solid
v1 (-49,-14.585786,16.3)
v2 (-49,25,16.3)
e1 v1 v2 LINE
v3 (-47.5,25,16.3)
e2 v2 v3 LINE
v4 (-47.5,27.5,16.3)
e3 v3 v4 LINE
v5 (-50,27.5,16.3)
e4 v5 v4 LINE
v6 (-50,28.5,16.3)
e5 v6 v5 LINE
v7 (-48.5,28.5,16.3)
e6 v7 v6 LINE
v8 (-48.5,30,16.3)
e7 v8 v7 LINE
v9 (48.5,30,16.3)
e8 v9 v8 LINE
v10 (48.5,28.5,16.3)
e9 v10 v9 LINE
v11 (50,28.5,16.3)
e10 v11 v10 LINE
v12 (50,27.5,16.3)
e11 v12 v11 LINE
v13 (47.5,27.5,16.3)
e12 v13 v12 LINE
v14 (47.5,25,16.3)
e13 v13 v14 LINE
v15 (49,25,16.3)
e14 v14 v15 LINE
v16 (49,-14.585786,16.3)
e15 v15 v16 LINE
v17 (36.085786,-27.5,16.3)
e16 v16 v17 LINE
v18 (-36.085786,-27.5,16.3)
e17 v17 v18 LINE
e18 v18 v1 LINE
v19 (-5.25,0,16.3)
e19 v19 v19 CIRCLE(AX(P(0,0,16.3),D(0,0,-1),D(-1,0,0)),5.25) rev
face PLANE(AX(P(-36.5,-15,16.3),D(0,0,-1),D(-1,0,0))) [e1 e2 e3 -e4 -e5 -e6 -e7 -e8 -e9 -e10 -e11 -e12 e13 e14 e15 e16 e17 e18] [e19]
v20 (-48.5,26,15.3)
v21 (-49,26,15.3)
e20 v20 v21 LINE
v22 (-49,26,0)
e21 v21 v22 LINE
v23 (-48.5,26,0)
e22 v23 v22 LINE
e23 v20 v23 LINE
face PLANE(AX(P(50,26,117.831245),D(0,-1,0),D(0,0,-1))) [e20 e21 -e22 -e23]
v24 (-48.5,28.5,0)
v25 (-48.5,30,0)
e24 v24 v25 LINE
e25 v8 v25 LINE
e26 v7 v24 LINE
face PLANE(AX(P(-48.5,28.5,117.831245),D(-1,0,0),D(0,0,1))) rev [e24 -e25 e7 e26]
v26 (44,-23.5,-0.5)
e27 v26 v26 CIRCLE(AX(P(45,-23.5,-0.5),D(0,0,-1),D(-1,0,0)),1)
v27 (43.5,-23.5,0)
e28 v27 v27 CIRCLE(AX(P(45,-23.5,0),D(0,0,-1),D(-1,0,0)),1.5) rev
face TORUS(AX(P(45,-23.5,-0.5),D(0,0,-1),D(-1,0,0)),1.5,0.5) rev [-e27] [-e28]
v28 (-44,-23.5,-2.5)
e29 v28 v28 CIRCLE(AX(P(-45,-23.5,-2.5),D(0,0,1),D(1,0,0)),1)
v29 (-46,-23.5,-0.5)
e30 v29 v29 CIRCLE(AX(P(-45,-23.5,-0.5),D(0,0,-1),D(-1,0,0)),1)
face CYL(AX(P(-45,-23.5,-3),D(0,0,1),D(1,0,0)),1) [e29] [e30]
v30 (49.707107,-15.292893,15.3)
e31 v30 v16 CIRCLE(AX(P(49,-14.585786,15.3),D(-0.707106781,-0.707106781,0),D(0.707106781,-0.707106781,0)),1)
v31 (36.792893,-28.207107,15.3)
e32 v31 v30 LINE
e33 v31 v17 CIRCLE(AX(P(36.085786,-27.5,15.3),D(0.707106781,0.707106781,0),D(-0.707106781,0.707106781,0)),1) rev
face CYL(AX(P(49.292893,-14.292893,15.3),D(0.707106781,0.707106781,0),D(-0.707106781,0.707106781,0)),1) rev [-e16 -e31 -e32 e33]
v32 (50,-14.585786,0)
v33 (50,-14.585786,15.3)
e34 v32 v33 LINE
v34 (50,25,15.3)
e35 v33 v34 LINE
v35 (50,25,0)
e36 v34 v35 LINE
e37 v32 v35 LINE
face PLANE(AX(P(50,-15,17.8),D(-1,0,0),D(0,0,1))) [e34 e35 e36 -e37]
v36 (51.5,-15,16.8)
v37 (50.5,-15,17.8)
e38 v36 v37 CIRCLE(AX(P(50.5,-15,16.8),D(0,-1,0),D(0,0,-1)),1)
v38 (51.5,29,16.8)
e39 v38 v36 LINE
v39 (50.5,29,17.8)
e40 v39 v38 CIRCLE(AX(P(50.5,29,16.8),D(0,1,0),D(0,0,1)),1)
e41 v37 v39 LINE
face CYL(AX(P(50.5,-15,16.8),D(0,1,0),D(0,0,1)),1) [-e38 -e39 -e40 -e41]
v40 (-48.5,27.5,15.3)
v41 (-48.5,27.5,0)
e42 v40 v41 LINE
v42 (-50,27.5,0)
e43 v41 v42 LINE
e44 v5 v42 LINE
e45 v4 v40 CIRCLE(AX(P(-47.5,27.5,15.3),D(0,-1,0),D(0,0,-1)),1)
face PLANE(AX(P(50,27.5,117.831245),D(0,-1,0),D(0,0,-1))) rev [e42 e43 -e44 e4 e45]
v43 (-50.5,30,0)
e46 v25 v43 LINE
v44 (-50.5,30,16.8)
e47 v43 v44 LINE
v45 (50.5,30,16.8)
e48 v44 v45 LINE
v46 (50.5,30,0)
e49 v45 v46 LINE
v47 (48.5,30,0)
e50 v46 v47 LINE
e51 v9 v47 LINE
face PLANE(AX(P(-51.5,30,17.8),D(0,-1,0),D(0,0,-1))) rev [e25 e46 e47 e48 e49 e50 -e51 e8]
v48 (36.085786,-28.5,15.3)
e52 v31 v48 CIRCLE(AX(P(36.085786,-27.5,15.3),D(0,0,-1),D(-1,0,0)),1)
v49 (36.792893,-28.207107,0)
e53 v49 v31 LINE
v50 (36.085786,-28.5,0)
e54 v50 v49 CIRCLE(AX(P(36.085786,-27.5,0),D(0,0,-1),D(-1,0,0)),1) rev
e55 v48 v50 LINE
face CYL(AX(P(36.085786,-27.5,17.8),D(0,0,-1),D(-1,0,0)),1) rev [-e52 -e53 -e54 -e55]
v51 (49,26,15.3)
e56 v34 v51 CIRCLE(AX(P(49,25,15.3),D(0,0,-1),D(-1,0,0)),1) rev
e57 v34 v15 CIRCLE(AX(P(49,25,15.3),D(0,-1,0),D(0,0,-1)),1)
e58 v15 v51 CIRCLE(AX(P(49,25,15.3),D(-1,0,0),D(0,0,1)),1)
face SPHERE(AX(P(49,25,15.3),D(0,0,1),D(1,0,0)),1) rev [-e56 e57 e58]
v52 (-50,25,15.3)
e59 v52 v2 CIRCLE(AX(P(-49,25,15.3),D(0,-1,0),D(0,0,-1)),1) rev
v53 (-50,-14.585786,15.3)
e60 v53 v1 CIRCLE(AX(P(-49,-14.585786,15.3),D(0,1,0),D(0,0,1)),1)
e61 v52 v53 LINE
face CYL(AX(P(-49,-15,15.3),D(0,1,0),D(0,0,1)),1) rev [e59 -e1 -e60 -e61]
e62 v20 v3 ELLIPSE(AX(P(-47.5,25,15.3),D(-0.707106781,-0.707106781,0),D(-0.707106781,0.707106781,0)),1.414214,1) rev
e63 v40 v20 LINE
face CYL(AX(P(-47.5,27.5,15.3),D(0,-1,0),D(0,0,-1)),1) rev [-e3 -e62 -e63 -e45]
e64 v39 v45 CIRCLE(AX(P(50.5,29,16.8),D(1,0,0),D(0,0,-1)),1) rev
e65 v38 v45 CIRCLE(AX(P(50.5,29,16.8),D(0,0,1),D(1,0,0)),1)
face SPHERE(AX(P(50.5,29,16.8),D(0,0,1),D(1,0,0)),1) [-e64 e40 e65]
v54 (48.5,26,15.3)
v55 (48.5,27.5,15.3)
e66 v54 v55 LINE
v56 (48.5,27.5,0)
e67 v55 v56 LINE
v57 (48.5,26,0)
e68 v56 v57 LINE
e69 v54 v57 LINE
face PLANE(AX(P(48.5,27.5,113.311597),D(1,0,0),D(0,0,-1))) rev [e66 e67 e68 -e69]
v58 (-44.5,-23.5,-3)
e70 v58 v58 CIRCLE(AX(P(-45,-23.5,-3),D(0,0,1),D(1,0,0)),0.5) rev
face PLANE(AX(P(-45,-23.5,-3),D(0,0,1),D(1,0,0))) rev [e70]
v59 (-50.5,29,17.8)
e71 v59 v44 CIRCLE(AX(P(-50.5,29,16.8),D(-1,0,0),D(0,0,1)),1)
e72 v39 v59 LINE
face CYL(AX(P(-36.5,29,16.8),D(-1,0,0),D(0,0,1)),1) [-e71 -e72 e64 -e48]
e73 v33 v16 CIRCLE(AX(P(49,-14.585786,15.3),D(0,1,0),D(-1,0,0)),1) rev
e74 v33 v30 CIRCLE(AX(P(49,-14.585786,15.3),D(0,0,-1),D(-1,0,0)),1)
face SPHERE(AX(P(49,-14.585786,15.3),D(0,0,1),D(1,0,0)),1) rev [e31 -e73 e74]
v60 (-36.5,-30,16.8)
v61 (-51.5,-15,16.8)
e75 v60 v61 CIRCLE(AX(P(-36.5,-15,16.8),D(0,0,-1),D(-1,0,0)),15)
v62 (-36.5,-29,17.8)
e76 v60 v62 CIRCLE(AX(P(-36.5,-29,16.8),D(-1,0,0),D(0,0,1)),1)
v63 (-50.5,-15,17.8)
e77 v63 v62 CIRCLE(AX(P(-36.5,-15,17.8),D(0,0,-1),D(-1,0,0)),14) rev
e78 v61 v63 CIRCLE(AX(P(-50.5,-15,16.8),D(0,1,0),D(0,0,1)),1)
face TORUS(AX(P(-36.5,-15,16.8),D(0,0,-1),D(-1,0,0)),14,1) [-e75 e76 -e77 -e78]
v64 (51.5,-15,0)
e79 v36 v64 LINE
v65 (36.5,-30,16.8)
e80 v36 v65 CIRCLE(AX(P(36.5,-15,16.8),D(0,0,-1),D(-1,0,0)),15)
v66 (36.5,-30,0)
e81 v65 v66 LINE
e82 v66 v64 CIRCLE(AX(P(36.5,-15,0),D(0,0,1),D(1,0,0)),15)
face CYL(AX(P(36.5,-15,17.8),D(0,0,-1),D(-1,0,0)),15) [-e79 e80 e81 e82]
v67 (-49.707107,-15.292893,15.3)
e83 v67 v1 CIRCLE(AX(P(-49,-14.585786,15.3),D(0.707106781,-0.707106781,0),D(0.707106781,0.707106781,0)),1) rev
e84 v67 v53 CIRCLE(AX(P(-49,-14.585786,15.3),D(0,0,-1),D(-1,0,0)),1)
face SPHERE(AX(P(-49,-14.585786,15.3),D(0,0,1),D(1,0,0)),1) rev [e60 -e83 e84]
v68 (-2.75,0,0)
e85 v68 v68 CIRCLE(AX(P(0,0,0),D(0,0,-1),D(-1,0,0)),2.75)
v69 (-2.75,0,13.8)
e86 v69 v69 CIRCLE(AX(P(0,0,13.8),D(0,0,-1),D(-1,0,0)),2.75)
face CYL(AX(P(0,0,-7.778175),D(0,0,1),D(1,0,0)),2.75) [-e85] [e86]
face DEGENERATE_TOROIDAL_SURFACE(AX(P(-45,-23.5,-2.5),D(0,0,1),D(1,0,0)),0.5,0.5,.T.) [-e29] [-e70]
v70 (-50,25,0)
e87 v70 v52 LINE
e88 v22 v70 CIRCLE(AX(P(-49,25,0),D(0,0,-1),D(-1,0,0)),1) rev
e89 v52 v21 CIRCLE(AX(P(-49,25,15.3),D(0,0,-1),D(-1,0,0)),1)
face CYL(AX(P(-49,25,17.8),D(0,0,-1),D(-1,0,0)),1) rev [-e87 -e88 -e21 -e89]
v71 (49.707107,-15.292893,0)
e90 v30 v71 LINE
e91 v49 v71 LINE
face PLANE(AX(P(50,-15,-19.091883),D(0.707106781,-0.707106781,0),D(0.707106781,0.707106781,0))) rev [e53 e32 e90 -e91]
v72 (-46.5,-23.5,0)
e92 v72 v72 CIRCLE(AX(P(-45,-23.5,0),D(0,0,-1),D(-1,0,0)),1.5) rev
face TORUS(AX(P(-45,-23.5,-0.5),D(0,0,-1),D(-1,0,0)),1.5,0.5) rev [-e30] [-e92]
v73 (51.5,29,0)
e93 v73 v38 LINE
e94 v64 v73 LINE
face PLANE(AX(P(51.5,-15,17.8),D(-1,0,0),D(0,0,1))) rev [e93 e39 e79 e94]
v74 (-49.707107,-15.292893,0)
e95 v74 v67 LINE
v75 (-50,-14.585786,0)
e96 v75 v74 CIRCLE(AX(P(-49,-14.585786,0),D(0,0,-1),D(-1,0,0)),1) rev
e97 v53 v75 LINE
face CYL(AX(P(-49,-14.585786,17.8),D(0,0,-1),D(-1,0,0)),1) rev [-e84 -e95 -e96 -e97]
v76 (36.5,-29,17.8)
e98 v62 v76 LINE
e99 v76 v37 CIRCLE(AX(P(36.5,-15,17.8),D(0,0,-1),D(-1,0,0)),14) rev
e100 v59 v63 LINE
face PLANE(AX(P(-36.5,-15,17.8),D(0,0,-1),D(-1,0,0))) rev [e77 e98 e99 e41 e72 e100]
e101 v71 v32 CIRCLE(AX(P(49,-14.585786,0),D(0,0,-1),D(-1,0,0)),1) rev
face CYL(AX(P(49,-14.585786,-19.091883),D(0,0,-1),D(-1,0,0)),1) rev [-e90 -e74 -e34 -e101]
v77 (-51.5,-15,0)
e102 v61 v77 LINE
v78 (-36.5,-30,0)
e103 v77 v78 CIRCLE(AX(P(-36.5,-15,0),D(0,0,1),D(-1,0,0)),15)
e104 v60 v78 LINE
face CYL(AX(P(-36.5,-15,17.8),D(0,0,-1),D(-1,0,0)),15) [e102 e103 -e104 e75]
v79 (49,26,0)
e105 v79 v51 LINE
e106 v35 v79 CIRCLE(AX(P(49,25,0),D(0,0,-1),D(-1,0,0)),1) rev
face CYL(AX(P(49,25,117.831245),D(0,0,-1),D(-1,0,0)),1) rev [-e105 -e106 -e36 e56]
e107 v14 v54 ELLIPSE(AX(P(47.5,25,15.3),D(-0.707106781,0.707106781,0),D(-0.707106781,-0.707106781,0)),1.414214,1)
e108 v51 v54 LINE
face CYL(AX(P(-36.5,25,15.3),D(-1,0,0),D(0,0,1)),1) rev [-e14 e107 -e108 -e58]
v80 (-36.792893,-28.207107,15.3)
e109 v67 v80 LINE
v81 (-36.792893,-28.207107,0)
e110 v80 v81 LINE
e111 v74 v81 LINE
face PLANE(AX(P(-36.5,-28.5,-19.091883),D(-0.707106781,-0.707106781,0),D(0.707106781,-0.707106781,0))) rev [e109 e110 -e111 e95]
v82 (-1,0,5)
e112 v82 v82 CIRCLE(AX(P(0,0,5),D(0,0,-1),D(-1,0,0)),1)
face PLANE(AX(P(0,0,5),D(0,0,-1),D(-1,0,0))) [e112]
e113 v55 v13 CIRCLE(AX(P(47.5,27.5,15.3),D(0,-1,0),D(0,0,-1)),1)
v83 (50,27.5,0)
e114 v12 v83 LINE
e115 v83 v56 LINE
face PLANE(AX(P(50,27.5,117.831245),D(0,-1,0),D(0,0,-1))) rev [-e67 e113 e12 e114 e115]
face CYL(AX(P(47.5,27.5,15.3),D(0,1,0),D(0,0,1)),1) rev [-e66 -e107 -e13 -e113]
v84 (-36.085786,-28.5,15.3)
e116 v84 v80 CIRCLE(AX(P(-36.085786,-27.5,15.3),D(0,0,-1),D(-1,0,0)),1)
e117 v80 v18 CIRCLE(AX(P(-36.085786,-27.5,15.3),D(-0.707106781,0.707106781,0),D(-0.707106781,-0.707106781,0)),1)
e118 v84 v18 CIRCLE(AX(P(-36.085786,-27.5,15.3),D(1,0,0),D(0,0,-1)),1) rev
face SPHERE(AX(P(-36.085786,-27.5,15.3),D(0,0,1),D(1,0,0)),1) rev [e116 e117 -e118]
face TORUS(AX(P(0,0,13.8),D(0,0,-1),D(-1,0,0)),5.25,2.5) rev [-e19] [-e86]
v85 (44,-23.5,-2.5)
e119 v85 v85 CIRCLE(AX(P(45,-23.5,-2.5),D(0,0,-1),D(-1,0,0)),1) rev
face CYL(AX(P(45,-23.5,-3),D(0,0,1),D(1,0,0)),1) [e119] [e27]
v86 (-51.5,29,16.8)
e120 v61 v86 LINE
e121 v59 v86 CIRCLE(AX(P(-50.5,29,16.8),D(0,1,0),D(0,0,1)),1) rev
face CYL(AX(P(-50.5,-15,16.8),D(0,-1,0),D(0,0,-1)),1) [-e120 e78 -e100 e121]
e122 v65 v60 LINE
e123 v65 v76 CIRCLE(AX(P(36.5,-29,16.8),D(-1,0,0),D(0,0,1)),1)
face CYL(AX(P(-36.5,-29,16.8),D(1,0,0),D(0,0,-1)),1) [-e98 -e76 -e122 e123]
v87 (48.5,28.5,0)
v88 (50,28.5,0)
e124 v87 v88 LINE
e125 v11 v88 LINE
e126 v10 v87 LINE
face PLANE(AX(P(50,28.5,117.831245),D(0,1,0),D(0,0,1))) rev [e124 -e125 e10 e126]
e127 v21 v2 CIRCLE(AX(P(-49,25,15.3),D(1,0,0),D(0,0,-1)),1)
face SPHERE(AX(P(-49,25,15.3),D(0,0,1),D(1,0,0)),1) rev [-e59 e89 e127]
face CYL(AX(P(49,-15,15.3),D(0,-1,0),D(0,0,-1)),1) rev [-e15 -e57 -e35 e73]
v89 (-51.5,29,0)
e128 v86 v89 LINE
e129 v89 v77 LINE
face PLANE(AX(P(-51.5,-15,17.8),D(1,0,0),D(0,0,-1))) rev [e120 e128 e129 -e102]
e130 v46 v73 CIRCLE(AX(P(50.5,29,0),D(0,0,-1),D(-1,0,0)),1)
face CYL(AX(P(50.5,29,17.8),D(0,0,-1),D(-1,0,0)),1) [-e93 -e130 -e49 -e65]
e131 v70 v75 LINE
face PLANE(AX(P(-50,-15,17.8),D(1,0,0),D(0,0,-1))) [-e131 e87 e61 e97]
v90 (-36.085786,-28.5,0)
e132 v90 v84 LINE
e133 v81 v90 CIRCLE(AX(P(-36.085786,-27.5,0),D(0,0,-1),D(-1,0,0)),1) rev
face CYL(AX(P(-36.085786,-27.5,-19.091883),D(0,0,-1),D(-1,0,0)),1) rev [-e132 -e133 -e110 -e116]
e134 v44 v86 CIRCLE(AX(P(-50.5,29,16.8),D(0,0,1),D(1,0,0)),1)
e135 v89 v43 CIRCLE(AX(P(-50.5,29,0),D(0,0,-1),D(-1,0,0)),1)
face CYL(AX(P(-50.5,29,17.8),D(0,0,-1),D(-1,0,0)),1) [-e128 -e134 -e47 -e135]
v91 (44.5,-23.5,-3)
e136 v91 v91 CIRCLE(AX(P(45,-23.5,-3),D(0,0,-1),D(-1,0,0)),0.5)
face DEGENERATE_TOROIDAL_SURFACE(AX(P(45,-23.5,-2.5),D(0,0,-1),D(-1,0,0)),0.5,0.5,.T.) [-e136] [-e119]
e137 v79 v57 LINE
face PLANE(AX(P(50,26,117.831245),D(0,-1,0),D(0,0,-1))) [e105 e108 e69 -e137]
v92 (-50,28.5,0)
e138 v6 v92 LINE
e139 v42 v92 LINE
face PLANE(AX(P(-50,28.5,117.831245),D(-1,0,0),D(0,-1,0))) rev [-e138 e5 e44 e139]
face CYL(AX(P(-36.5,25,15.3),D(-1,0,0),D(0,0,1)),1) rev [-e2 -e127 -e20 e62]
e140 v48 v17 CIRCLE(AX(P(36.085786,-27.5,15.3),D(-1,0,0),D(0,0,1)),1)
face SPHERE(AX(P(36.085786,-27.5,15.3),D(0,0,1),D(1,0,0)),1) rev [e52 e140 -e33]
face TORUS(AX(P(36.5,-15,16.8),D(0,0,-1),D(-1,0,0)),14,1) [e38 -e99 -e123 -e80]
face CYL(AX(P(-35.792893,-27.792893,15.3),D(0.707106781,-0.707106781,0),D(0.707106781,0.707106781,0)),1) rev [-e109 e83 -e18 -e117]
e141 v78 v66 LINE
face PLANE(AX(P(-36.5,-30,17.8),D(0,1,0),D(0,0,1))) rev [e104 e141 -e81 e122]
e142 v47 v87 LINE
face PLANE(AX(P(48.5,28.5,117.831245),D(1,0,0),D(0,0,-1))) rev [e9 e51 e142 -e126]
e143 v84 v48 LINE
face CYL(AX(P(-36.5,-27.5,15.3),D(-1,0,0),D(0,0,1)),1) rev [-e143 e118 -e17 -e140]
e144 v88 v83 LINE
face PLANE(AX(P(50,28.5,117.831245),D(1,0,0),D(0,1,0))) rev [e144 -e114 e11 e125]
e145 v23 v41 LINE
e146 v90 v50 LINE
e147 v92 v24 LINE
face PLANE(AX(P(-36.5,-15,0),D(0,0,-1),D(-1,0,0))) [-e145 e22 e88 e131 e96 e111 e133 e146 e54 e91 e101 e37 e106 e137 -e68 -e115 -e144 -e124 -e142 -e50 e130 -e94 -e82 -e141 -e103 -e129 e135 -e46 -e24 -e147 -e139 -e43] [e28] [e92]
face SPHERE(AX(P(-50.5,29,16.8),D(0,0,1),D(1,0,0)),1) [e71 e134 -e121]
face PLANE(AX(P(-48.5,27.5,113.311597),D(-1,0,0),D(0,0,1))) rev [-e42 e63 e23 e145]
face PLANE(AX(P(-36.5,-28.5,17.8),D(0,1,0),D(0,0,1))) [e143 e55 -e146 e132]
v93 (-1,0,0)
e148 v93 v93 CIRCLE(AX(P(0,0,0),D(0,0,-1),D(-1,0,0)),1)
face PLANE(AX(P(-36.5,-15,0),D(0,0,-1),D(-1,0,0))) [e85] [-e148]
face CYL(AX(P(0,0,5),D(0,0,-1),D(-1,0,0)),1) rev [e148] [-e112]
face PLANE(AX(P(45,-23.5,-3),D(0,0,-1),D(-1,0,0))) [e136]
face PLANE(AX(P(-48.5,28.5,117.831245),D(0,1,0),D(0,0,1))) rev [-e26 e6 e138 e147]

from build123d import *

# Parameters (mm, degrees)
BOSS_EXTRU_1_DEPTH      = 17.8
ENL_V_MAT_EXTRU_1_DEPTH = 16.3
COQUE2_DEPTH            = 16.3
ESQUISSE3_W             = 97
ESQUISSE3_H             = 1.5
ENL_V_MAT_EXTRU_2_DEPTH = 16.3
ESQUISSE4_R             = 2.75
BOSS_EXTRU_2_DEPTH      = 16.3
CONG_3_R                = 2.5
ESQUISSE5_R             = 1
ENL_V_MAT_EXTRU_3_DEPTH = 5
BOSS_EXTRU_4_START      = 16.3
BOSS_EXTRU_4_DEPTH      = 16.3
CONG_4_R                = 1
ESQUISSE8_R             = 1
BOSS_EXTRU_5_DEPTH      = 3
CONG_5_R                = 0.5
CONG_6_R                = 1


# Read off the part's stored shape, not the designer's step: Coque2
with BuildPart() as part:
    # Esquisse1 → Boss.-Extru.1 (new body)
    with BuildSketch(Plane.XY):
        with BuildLine():
            Line((-36.5, -30), (36.5, -30))
            ThreePointArc((36.5, -30), (47.106601718, -25.606601718), (51.5, -15))
            Line((51.5, -15), (51.5, 30))
            Line((51.5, 30), (-51.5, 30))
            Line((-51.5, 30), (-51.5, -15))
            ThreePointArc((-51.5, -15), (-47.106601718, -25.606601718), (-36.5, -30))
        make_face()
    extrude(amount=BOSS_EXTRU_1_DEPTH)

    # Esquisse2 → Enlèv. mat.-Extru.1 (cut)
    with BuildSketch(Plane(origin=(0, 0, 0), x_dir=(-1, 0, 0), z_dir=(0, 0, -1))):
        Polygon((-50, 28.5), (-48.5, 28.5), (-48.5, 30), (48.5, 30), (48.5, 28.5), (50, 28.5), (50, 27.5), (-50, 27.5), align=None)
    extrude(amount=-ENL_V_MAT_EXTRU_1_DEPTH, mode=Mode.SUBTRACT)

    # Coque2 outline → Coque2 (cut)
    with BuildSketch(Plane.XY):
        with BuildLine():
            Line((50, -15), (50, 26))
            Line((50, 26), (-50, 26))
            Line((-50, 26), (-50, -15))
            ThreePointArc((-50, -15), (-46.045941546, -24.545941546), (-36.5, -28.5))
            Line((-36.5, -28.5), (36.5, -28.5))
            ThreePointArc((36.5, -28.5), (46.045941546, -24.545941546), (50, -15))
        make_face()
    extrude(amount=COQUE2_DEPTH, mode=Mode.SUBTRACT)

    # Esquisse3 → Enlèv. mat.-Extru.2 (cut)
    with BuildSketch(Plane(origin=(0, 0, 0), x_dir=(-1, 0, 0), z_dir=(0, 0, -1))):
        with Locations((0, 26.75)):
            Rectangle(ESQUISSE3_W, ESQUISSE3_H)
    extrude(amount=-ENL_V_MAT_EXTRU_2_DEPTH, mode=Mode.SUBTRACT)

    # Esquisse4 → Boss.-Extru.2 (add)
    with BuildSketch(Plane(origin=(0, 0, 16.3), x_dir=(-1, 0, 0), z_dir=(0, 0, -1))):
        Circle(ESQUISSE4_R)
    extrude(amount=BOSS_EXTRU_2_DEPTH)

    # Congé3
    cong_3_edges = [part.edges().sort_by_distance(p)[0] for p in [
        (2.75, 0, 16.3),
    ]]
    fillet(cong_3_edges, radius=CONG_3_R)

    # Esquisse5 → Enlèv. mat.-Extru.3 (cut)
    with BuildSketch(Plane(origin=(0, 0, 0), x_dir=(-1, 0, 0), z_dir=(0, 0, -1))):
        Circle(ESQUISSE5_R)
    extrude(amount=-ENL_V_MAT_EXTRU_3_DEPTH, mode=Mode.SUBTRACT)

    # Esquisse7 → Boss.-Extru.4 (add)
    with BuildSketch(Plane(origin=(0, 0, 16.3), x_dir=(-1, 0, 0), z_dir=(0, 0, -1)).offset(BOSS_EXTRU_4_START)):
        with BuildLine():
            Line((-50, -15), (-36.5, -28.5))
            ThreePointArc((-36.5, -28.5), (-46.045941546, -24.545941546), (-50, -15))
        make_face()
        with BuildLine():
            Line((36.5, -28.5), (50, -15))
            ThreePointArc((50, -15), (46.045941546, -24.545941546), (36.5, -28.5))
        make_face()
    extrude(amount=-BOSS_EXTRU_4_DEPTH)

    # Congé4
    cong_4_edges = [part.edges().sort_by_distance(p)[0] for p in [
        (43.25, -21.75, 16.3),
        (-43.25, -21.75, 16.3),
        (50, 26, 8.15),
        (50, -15, 8.15),
        (-50, -15, 8.15),
        (-36.5, -28.5, 8.15),
        (36.5, -28.5, 8.15),
        (-50, 5.5, 16.3),
        (0, -28.5, 16.3),
        (50, 5.5, 16.3),
        (-50, 26, 8.15),
        (-49.25, 26, 16.3),
        (49.25, 26, 16.3),
        (48.5, 26.75, 16.3),
        (-48.5, 26.75, 16.3),
    ]]
    fillet(cong_4_edges, radius=CONG_4_R)

    # Esquisse8 → Boss.-Extru.5 (add)
    with BuildSketch(Plane(origin=(0, 0, 0), x_dir=(-1, 0, 0), z_dir=(0, 0, -1))):
        with Locations((-45, -23.5)):
            Circle(ESQUISSE8_R)
        with Locations(Location((45, -23.5, 0), (0, 0, 180))):
            Circle(ESQUISSE8_R)
    extrude(amount=BOSS_EXTRU_5_DEPTH)

    # Congé5
    cong_5_edges = [part.edges().sort_by_distance(p)[0] for p in [
        (46, -23.5, 0),
        (46, -23.5, -3),
        (-46, -23.5, 0),
        (-46, -23.5, -3),
    ]]
    fillet(cong_5_edges, radius=CONG_5_R)

    # Congé6
    cong_6_edges = [part.edges().sort_by_distance(p)[0] for p in [
        (-51.5, 7.5, 17.8),
        (-51.5, 30, 8.9),
        (51.5, 30, 8.9),
        (-47.106601718, -25.606601718, 17.8),
        (0, -30, 17.8),
        (47.106601718, -25.606601718, 17.8),
        (51.5, 7.5, 17.8),
        (0, 30, 17.8),
    ]]
    fillet(cong_6_edges, radius=CONG_6_R)


solid = part.part
